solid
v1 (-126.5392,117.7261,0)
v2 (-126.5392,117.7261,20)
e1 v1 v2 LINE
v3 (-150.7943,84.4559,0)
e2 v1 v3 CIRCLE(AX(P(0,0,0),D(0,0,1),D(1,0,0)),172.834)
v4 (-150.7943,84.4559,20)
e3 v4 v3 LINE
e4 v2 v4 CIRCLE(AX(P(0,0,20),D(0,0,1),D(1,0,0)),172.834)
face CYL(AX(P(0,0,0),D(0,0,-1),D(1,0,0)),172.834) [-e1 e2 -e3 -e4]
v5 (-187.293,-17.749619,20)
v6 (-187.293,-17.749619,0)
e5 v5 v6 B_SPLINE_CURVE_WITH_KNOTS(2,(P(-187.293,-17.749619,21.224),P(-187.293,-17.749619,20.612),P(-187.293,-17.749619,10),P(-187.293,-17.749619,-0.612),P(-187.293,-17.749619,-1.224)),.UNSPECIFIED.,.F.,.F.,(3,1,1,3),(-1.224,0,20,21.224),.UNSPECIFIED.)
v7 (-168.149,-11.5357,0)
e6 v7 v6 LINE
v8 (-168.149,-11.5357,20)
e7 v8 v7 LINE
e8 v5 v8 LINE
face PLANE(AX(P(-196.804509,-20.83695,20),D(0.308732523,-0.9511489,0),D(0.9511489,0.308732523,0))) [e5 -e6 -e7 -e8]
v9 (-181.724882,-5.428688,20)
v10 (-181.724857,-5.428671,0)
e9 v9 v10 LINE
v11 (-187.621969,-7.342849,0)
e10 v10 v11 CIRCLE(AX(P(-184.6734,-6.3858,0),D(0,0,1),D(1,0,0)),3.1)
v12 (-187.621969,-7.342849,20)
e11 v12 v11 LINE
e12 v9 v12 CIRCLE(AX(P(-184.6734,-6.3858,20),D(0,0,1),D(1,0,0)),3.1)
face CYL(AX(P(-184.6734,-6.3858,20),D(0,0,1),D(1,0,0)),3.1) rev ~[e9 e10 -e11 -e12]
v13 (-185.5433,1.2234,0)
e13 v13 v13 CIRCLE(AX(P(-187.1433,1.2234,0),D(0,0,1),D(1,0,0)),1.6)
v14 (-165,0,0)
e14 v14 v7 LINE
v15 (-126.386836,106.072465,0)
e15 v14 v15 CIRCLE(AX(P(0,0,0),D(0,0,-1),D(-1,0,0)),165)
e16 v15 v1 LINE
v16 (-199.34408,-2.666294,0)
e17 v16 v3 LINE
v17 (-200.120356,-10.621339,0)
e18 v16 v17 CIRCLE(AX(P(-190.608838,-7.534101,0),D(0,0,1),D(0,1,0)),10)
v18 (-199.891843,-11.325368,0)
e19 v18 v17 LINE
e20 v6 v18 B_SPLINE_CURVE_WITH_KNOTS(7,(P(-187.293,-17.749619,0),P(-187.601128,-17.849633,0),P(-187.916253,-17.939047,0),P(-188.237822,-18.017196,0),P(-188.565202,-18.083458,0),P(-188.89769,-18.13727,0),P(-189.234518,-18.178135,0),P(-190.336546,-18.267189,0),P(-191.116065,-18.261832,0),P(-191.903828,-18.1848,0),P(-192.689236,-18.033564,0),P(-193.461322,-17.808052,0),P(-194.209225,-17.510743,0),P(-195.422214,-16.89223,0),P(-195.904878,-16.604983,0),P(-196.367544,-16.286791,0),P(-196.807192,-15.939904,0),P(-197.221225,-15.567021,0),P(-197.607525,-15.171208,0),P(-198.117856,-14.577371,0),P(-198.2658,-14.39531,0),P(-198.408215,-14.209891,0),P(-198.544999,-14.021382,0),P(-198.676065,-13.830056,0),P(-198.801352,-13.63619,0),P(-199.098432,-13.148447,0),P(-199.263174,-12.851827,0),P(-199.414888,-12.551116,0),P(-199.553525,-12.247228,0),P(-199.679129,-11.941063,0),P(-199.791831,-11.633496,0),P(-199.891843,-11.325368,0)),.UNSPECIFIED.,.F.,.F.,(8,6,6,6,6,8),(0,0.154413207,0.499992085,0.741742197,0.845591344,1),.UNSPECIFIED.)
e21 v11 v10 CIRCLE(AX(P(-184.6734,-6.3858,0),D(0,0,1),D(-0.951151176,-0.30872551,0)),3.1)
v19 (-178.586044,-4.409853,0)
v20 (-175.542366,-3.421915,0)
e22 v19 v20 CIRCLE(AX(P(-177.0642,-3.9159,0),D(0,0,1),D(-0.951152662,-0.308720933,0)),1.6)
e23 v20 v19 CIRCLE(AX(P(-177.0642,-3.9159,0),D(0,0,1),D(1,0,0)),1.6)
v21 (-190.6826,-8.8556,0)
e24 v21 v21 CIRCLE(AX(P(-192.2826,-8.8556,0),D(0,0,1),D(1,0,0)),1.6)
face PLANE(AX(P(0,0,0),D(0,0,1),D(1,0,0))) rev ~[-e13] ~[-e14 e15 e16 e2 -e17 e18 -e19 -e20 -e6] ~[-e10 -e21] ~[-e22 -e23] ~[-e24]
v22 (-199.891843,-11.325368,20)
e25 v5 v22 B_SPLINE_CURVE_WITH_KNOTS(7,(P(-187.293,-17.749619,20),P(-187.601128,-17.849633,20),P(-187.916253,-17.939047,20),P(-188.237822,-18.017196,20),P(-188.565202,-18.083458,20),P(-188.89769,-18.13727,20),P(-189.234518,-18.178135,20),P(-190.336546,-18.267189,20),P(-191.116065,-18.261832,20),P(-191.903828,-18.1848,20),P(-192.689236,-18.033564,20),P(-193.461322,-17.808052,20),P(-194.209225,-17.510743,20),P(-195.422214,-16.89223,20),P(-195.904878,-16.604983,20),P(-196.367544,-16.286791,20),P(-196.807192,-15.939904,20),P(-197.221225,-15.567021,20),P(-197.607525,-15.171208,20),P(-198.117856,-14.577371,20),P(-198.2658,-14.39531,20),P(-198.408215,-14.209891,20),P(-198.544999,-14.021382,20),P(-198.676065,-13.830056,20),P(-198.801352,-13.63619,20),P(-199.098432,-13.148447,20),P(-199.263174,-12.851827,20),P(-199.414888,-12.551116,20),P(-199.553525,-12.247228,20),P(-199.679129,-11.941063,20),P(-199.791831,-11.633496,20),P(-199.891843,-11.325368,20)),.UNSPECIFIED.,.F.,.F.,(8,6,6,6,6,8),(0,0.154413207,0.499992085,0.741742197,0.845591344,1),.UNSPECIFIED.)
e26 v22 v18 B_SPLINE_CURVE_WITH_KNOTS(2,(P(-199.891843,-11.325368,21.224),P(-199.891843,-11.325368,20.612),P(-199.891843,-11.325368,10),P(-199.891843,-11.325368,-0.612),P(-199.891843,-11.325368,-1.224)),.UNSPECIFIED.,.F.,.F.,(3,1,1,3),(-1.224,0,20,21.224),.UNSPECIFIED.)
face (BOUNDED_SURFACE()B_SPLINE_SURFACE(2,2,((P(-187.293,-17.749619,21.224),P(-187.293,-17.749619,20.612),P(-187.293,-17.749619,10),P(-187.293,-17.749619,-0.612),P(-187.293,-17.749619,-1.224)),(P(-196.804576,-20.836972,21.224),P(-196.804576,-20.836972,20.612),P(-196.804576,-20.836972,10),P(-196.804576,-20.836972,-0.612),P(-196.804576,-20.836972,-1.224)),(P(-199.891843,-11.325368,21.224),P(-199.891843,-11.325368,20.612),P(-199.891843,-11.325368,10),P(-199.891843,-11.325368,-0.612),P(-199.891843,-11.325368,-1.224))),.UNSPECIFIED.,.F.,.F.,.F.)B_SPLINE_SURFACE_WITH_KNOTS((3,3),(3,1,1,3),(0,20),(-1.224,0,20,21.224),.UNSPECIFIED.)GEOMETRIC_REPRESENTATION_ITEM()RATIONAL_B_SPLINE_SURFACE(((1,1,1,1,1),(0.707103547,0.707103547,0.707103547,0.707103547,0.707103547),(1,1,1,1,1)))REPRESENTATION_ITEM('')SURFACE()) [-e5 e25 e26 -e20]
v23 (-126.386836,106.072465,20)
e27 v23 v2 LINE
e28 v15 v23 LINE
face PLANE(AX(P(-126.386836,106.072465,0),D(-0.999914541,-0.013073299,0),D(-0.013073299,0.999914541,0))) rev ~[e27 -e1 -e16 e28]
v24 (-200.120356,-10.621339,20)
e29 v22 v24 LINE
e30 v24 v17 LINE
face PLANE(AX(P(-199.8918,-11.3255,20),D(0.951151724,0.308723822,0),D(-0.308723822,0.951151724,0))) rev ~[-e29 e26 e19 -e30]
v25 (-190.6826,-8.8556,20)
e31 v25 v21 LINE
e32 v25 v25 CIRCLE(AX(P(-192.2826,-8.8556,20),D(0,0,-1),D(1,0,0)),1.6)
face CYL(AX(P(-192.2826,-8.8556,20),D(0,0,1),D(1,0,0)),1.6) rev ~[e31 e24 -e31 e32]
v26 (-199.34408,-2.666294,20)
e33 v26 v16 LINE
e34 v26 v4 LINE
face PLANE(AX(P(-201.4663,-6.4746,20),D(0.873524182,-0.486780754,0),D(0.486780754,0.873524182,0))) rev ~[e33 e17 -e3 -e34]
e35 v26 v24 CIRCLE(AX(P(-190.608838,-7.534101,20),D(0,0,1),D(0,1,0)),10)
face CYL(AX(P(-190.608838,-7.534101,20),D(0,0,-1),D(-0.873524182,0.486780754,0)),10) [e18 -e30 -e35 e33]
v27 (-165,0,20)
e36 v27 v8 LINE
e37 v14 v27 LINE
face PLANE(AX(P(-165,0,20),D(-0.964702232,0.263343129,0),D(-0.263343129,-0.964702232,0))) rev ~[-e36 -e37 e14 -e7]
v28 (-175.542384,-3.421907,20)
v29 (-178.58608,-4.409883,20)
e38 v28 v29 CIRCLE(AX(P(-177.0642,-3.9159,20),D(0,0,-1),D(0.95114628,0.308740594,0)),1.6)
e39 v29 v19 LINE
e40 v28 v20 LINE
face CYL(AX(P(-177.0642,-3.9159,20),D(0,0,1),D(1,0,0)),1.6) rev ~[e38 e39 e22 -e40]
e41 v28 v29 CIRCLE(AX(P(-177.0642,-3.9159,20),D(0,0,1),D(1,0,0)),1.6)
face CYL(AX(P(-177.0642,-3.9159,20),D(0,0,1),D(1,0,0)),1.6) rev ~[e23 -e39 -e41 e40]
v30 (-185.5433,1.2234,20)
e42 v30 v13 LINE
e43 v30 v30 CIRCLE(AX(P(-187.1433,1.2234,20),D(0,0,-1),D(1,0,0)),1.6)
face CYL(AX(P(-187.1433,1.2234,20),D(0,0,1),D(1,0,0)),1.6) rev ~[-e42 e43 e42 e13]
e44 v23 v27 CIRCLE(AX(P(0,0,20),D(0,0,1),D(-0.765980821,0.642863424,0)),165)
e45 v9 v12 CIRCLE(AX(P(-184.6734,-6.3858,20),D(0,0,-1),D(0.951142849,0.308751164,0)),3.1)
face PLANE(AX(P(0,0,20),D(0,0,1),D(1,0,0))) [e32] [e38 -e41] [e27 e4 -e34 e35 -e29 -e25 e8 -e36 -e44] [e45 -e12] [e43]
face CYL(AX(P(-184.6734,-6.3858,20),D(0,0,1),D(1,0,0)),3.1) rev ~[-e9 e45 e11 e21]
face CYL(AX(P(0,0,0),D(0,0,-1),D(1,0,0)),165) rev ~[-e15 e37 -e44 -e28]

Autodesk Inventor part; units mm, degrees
ref_plane "YZ Plane" through (0, 0, 0) normal (1, 0, 0) x (0, 1, 0)
ref_plane "XZ Plane" through (0, 0, 0) normal (0, 1, 0) x (-1, 0, 0)
ref_plane "XY Plane" through (0, 0, 0) normal (0, 0, 1) x (1, 0, 0)
sketch "Эскиз1" plane through (0, 0, 0) normal (0, 0, 1) x (1, 0, 0)
  circle A0 centre (0, 0) radius 165
  circle A1 centre (0, 0) radius 172.834
  line L0 (-125, 0) -> (-126.5392, 117.7261)
  line L1 (-132.7592, 119.5177) -> (-197.8467, 76.6552)
  line L2 (-165, 0) -> (-153, 0) construction
  line L3 (-134.7038, 9.8338) -> (-172.765, -2.5204) projected
  line L4 (-165, 0) -> (-172.8154, -2.5368)
  point P0 (-172.834, 0)
  point P1 (-126.3868, 106.0725)
  point P2 (-123, 114.4334)
  point P3 (-172.8149, -2.5694)
  dimension "d0" = 330
  dimension "d1" = 345.668
  dimension "d2" = 40
extrude "Выдавливание1" add sketch "Эскиз1" along normal blind 20 contours L3 L4 A1 L0 A0 picked at (-133.2989, 101.385)
sketch "Эскиз2" plane through (0, 0, 0) normal (0, 0, -1) x (-1, 0, 0)
  arc A0 (172.8154, -2.5368) -> (126.5392, 117.7261) centre (0, 0) ccw projected
  arc A1 (165, 0) -> (126.3868, 106.0725) centre (0, 0) ccw projected
  circle A2 centre (0, 0) radius 168.917
  line L0 (172.8154, -2.5368) -> (165, 0) projected
  circle A3 centre (184.6734, -6.3858) radius 2.1
  line L1 (178.0154, -4.2246) -> (172.8154, -2.5368)
  line L2 (160.1198, 6.946) -> (198.8648, -5.6302)
  line L3 (182.8662, -5.7992) -> (187.0032, 6.946)
  line L4 (178.0154, -4.2246) -> (198.192, -10.7737)
  line L5 (184.6734, -6.3858) -> (189.5243, -7.9603)
  line L6 (189.5243, -7.9603) -> (192.7095, 1.8528)
  point P0 (184.4408, -0.9483)
  point P1 (172.8109, 2.8266)
  point P2 (176.018, -3.5763)
  point P3 (182.676, -5.7374)
  point P4 (183.1424, -4.9484)
  point P5 (164.9119, 5.3905)
  point P6 (186.6708, -7.0341)
  point P7 (191.0988, -3.1094)
  dimension "d8" = 337.834
  dimension "d11" = 4.2
  dimension "d18" = 5.1
extrude "Выдавливание2" add sketch "Эскиз2" against normal up to surface (20 mm away) contours L0 A2 L2 A0 | A0 L2 L3 A3 L4 L1 | L0 A1 L2 A2 | L2 L6 L4 A3 L3 picked at (166.282, 2.7097)
sketch "Эскиз3" plane through (0, 0, 20) normal (0, 0, 1) x (1, 0, 0)
  arc A0 (-126.3868, 106.0725) -> (-165, 0) centre (0, 0) ccw projected
  line L0 (-126.3868, 106.0725) -> (-126.5392, 117.7261) projected
  arc A1 (-126.5392, 117.7261) -> (-172.8109, 2.8266) centre (0, 0) ccw projected
  line L1 (-191.0988, -3.1094) -> (-172.8109, 2.8266) projected
  line L2 (-189.5243, -7.9603) -> (-191.0988, -3.1094) projected
  line L3 (-186.6708, -7.0341) -> (-189.5243, -7.9603) projected
  arc A2 (-182.676, -5.7374) -> (-186.6708, -7.0341) centre (-184.6734, -6.3858) ccw projected
  line L4 (-165, 0) -> (-182.676, -5.7374) projected
  circle A3 centre (-184.6734, -6.3858) radius 3.1
  arc A4 (-126.5392, 117.7261) -> (-172.8109, 2.8266) centre (0, 0) ccw projected
  line L5 (-184.6734, -6.3858) -> (-194.1849, -9.4731)
  line L6 (-194.1849, -9.4731) -> (-195.7594, -4.6222)
  line L7 (-195.7594, -4.6222) -> (-191.0988, -3.1094)
  circle A5 centre (-184.6734, -6.3858) radius 11
  circle A6 centre (-184.6734, -6.3858) radius 9.5
  circle A7 centre (-184.6734, -6.3858) radius 6.5
  line L8 (-190.8559, -8.3925) -> (-193.7093, -9.3187)
  circle A8 centre (-192.2826, -8.8556) radius 1.6
  circle A9 centre (-182.2036, -13.995) radius 1.6
  circle A10 centre (-177.0642, -3.9159) radius 1.6
  circle A11 centre (-187.1433, 1.2234) radius 1.6
  line L9 (-192.2826, -8.8556) -> (-199.8918, -11.3255)
  line L10 (-199.8918, -11.3255) -> (-201.4663, -6.4746)
  line L11 (-201.4663, -6.4746) -> (-191.0988, -3.1094)
  line L12 (-201.4663, -6.4746) -> (-195.8644, -23.7333)
  line L13 (-172.8109, 2.8266) -> (-166.0857, -17.8924)
  line L14 (-184.6734, -6.3858) -> (-181.5861, -15.8973)
  line L15 (-165, 0) -> (-182.676, -5.7374) projected
  line L16 (-209.847, -25.0704) -> (-154.8396, -7.2156)
  line L17 (-201.4663, -6.4746) -> (-150.7943, 84.4559)
  line L18 (-165, 0) -> (-168.149, -11.5357)
  point P0 (-182.1957, -12.395)
  point P1 (-183.1496, -12.7046)
  point P2 (-195.5181, -4.5439)
  point P3 (-195.5997, -5.1144)
  point P4 (-193.5037, -9.8895)
  point P5 (-175.4687, -4.0356)
  point P6 (-178.5861, -4.4099)
  point P7 (-181.7249, -5.4287)
  point P8 (-187.622, -7.3428)
  point P9 (-150.9747, 84.1323)
  point P10 (-193.8045, -9.3496)
  point P11 (-196.8045, -20.837)
  point P12 (-168.149, -11.5357)
  point P13 (-171.2364, -2.0242)
  point P14 (-175.5424, -3.4219)
  point P15 (-181.1697, -15.216)
  point P16 (-182.3233, -15.5905)
  dimension "d22" = 19
  dimension "d23" = 13
  dimension "d19" = 6.2
  dimension "d20" = 10
  dimension "d21" = 22
  dimension "d24" = 3.2
  dimension "d27" = 360
  dimension "d29" = 8
  dimension "d30" = 10
  dimension "d33" = 10
extrude "Выдавливание3" add sketch "Эскиз3" against normal up to surface (20 mm away) contours A1 L1 A5 L7 L11 L17 | L11 L6 A5 L9 L10 | L1 A6 A11 L7 A5 | L13 L16 A5 L4 | L4 L18 L13 | L9 A5 L16 L12 | L7 A5 L6 | L1 A7 A11 A6 | A5 L16 L14 A9 A6 A10 L4 | L7 A6 A8 L5 L6 A5 | L9 L5 A8 A6 A9 L14 L16 A5 | A5 L6 L9 | L1 A7 A11 | A6 A11 A7 L1 L7 | L7 L2 A7 A8 A6 | L2 L5 A8 A7 | A10 A7 A9 L14 A3 L4 | A6 A9 A7 A10 | L14 A6 A9 | A9 A6 L14 | A8 A7 A9 A6 | L3 A3 L14 A9 A7 A8 L5 | A9 A7 L14 A6 | A6 L14 A7 A9 | A9 L14 A7 | L14 A9 A7
sketch "Эскиз4" plane through (0, 0, 20) normal (0, 0, 1) x (1, 0, 0)
  arc A0 (-187.622, -7.3428) -> (-181.7249, -5.4287) centre (-184.6734, -6.3858) ccw projected
  arc A1 (-178.5861, -4.4099) -> (-175.5424, -3.4219) centre (-177.0642, -3.9159) ccw projected
  circle A2 centre (-184.6734, -6.3858) radius 3.1
  circle A3 centre (-177.0642, -3.9159) radius 1.6
  point P0 (0, 0)
  point P1 (-175.5424, -3.4219)
  point P2 (-178.5861, -4.4099)
  point P3 (-181.7249, -5.4287)
  point P4 (-187.622, -7.3428)
extrude "Выдавливание4" cut sketch "Эскиз4" against normal through all
fillet "Сопряжение2" radius 10 2 edges at (-201.4663, -6.4746, 10) (-196.8045, -20.837, 10)
properties part number "направление"
